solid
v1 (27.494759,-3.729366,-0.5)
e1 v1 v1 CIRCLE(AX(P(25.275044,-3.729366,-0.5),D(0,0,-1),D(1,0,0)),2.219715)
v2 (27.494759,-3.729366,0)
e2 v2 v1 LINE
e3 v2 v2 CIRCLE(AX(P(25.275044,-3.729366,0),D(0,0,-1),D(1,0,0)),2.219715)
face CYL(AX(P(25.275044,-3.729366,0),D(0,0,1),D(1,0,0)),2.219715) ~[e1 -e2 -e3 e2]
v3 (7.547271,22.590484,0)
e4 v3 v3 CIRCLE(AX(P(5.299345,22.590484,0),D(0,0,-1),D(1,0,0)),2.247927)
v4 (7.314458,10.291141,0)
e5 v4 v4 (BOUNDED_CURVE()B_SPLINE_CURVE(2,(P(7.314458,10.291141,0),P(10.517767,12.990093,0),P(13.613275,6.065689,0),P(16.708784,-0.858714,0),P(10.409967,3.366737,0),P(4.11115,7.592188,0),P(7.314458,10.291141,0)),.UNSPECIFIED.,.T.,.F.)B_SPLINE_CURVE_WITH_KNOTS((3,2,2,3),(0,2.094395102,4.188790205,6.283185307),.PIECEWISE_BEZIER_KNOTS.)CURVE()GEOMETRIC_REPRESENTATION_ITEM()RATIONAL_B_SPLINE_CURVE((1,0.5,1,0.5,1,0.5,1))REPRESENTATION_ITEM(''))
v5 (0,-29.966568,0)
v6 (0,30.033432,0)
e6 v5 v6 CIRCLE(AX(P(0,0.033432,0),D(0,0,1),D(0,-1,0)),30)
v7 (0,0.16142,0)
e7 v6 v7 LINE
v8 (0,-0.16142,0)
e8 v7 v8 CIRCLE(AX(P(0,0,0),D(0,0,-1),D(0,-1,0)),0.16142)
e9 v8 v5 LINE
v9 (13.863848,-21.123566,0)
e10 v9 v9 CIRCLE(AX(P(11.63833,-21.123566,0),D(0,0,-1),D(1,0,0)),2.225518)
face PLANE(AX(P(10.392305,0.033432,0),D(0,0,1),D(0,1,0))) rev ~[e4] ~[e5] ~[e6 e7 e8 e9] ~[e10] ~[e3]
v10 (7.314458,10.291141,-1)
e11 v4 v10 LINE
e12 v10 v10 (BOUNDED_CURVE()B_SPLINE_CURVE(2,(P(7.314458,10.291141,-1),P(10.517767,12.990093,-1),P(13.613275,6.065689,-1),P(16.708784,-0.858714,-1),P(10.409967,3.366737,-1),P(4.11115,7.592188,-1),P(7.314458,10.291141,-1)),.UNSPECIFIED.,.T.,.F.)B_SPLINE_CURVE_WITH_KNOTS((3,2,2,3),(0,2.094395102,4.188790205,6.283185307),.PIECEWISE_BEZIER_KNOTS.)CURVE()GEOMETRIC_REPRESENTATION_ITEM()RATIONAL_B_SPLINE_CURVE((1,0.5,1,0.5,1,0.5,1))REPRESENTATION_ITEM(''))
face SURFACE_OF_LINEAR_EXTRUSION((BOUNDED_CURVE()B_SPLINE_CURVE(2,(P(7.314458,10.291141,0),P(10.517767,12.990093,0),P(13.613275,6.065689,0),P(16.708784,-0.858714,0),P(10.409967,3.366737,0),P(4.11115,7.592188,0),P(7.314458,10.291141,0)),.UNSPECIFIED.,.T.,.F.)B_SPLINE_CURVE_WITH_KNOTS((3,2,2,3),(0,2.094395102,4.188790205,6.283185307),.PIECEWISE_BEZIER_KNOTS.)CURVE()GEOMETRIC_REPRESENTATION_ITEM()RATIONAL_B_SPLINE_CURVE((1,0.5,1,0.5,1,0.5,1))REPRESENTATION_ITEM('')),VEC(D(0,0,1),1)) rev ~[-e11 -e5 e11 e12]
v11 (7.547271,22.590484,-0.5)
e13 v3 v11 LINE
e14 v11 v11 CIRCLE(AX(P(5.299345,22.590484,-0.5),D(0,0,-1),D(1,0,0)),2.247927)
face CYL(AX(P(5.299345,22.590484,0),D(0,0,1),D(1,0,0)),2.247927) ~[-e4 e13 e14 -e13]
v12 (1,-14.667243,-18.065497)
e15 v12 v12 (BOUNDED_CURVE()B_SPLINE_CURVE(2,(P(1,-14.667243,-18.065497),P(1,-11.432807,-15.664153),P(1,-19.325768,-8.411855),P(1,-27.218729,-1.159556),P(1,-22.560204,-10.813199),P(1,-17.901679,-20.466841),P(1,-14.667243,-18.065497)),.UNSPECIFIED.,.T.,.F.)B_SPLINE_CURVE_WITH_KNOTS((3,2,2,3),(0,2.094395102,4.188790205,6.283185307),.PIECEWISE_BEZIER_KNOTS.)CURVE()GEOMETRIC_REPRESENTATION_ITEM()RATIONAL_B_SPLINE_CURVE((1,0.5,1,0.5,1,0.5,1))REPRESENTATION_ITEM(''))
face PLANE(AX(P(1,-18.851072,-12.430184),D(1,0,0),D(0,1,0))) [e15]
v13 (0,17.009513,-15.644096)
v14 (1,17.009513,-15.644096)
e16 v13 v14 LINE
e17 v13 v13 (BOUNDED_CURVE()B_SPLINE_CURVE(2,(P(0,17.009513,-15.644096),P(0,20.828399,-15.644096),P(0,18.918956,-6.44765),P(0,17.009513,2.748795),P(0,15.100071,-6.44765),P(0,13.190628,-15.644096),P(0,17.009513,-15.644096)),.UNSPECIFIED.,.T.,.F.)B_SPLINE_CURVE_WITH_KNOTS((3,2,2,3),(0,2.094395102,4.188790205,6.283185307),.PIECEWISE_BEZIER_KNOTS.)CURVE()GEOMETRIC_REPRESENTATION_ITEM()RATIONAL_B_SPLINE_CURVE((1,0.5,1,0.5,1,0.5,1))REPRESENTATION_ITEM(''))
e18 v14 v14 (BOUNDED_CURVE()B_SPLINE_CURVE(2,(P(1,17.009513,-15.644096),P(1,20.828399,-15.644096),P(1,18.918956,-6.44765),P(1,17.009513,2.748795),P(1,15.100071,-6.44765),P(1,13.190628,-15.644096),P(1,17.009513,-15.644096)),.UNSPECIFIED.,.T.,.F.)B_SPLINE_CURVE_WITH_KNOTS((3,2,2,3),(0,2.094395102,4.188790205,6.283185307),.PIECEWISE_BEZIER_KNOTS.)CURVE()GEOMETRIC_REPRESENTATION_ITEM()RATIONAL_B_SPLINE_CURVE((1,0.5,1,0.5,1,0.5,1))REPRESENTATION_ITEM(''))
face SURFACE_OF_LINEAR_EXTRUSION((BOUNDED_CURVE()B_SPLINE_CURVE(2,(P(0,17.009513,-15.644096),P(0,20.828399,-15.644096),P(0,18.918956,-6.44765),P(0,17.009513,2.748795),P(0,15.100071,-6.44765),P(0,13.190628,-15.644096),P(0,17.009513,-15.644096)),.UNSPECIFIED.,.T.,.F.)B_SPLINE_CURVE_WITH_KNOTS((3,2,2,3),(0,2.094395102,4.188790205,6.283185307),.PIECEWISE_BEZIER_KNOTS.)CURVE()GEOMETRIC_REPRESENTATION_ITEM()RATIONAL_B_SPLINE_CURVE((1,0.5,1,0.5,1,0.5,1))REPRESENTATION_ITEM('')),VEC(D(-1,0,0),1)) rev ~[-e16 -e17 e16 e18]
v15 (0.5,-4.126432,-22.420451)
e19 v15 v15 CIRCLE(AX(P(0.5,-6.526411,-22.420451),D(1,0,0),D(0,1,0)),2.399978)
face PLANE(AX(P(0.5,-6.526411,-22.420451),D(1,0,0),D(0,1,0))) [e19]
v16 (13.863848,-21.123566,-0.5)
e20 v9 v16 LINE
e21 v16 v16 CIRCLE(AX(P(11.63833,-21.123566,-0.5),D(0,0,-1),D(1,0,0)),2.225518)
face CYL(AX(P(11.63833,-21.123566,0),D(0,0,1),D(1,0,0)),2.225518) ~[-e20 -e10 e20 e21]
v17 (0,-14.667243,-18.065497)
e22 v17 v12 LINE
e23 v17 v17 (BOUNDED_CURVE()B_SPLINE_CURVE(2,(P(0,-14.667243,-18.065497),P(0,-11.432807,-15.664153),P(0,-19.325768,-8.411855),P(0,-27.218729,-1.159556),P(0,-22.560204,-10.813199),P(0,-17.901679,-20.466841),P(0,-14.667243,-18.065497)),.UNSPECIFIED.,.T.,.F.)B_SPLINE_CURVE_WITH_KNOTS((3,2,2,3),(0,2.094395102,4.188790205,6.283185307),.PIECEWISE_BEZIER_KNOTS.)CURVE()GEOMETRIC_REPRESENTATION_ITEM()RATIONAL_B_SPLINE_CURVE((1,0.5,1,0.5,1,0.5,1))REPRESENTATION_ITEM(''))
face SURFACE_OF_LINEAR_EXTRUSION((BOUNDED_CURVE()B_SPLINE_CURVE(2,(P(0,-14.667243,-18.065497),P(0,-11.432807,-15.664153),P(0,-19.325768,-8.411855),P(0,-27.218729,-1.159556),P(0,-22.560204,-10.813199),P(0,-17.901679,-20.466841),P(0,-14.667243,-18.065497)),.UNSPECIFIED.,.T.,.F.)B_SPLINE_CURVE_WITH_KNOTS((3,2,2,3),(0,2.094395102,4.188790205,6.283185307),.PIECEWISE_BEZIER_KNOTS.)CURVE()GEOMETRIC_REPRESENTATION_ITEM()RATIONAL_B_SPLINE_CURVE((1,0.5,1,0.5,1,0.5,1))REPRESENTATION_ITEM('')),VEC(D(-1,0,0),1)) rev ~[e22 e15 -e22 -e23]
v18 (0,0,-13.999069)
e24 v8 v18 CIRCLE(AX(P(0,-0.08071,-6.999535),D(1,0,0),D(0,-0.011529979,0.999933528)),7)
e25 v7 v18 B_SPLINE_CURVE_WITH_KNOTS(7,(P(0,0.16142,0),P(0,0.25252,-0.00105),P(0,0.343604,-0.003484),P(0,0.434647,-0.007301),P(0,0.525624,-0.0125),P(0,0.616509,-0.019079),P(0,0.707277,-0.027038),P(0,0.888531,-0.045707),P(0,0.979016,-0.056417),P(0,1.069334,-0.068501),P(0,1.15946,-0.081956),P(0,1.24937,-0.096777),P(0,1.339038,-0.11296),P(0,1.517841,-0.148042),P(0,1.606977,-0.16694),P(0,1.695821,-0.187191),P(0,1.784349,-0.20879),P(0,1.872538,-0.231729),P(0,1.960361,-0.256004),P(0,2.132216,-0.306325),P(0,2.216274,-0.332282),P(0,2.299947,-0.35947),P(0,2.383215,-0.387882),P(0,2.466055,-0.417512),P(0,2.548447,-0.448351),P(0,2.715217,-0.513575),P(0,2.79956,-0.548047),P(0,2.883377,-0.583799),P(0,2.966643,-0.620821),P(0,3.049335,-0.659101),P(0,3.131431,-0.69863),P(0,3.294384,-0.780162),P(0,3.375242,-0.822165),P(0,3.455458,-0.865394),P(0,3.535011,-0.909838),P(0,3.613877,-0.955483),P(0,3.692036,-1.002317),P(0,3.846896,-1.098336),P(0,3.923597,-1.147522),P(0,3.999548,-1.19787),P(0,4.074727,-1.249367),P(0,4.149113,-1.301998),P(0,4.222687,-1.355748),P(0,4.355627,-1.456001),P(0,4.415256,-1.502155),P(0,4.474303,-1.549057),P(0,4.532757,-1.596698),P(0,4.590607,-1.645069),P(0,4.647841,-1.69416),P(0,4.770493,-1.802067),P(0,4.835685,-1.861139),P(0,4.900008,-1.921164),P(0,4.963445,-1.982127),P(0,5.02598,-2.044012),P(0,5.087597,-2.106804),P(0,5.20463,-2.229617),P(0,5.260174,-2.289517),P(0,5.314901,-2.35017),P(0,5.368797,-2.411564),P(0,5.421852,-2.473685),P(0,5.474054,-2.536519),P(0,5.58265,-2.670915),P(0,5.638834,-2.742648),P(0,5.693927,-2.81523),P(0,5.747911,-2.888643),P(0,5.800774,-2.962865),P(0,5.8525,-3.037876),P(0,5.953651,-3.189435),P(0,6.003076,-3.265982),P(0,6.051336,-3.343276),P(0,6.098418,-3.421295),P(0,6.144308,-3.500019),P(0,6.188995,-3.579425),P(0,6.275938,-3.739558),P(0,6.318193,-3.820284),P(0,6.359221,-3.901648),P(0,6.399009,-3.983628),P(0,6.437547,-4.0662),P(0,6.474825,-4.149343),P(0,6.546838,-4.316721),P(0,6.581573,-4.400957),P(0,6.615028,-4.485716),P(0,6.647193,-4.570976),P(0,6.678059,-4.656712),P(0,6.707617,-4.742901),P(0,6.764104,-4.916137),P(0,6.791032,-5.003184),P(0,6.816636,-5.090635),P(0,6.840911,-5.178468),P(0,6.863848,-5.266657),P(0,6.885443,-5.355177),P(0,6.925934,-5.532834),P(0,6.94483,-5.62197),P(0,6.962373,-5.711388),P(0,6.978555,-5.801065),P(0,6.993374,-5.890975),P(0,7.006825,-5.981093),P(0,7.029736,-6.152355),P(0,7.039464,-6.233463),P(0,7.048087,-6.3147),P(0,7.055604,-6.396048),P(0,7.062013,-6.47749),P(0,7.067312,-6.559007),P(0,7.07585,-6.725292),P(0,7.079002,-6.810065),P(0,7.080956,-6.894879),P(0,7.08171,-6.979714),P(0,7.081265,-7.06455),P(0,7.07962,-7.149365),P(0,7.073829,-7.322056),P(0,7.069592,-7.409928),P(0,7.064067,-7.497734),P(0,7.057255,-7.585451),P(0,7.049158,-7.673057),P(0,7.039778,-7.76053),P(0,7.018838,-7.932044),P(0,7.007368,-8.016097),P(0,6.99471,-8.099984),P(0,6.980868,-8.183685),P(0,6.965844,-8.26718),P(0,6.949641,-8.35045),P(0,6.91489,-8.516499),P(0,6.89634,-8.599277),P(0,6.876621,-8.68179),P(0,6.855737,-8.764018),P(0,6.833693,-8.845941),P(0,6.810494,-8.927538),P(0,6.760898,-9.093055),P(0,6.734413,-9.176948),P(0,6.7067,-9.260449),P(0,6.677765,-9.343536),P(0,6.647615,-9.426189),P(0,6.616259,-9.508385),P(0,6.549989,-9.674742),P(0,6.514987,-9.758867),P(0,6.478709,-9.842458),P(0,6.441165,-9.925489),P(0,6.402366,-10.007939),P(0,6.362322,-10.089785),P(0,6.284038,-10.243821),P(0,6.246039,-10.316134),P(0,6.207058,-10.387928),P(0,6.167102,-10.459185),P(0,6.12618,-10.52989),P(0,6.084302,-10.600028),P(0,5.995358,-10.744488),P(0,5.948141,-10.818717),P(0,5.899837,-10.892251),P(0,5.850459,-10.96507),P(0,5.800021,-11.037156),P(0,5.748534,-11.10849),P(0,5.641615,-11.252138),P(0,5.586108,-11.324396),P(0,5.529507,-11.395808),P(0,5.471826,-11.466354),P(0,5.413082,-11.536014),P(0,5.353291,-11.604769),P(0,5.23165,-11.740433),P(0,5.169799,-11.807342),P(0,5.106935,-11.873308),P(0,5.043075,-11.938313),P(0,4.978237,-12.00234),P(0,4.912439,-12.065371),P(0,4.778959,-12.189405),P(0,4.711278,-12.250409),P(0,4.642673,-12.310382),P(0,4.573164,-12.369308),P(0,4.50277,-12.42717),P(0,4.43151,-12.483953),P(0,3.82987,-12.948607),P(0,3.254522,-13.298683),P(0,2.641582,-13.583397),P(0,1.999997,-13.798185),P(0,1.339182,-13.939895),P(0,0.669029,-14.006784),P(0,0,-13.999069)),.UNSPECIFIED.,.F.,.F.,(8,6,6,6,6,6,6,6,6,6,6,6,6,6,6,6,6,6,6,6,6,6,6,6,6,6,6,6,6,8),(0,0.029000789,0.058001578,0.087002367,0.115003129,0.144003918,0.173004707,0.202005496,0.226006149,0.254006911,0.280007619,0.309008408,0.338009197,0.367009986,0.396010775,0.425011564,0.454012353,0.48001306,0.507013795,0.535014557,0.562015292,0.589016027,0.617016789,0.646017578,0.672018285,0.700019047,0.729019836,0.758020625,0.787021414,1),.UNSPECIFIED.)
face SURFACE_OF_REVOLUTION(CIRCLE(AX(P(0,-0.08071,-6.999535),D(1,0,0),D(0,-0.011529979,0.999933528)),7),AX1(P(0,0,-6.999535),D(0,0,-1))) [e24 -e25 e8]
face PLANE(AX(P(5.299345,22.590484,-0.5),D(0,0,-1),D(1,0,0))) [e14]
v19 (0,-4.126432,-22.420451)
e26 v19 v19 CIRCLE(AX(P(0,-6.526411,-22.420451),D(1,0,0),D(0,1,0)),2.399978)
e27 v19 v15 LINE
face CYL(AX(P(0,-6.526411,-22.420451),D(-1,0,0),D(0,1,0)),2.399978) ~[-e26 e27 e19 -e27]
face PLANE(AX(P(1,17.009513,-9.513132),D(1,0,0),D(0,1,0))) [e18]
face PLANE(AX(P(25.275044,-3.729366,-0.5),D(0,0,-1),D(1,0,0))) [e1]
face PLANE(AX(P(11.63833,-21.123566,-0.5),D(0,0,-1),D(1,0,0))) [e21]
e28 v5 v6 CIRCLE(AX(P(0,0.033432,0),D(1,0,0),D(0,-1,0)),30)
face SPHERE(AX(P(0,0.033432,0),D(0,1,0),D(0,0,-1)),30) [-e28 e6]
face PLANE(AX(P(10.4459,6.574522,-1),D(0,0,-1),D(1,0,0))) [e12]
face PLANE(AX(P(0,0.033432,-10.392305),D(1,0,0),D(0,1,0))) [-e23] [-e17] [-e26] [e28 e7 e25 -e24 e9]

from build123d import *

# Parameters (mm, degrees)
F1_ANGLE  = 270
F5_DEPTH  = 1
F7_DEPTH  = 1
F8_R      = 2.3999784267
F9_DEPTH  = 0.5
F10_R     = 2.2479266401
F11_DEPTH = 0.5
F12_R     = 2.219715214
F13_DEPTH = 0.5
F14_R     = 2.225517588
F15_DEPTH = 0.5
F21_DEPTH = 1


# Not quite as in the source:
# - the program builds the solid bodies; features that only make, move or delete a surface that nothing else refers to are left out


with BuildPart() as f1:
    # F0 (on Right) → F1 (revolve)
    with BuildSketch(Plane.YZ):
        with BuildLine():
            Line((30.0334315861, 0), (-29.9665684139, 0))
            ThreePointArc((-29.9665684139, 0), (0.0334315861, -30), (30.0334315861, 0))
        make_face()
    revolve(axis=Axis((0, 0.0334315861, 0), (0, 1, 0)), revolution_arc=F1_ANGLE)

    # F2 (on face) → F3 (revolve)
    with BuildSketch(Plane.YZ):
        with BuildLine():
            Line((0, -13.9990693861), (0, 0))
            Line((0, 0), (-0.1614197102, 0))
            ThreePointArc((-0.1614197102, 0), (-7.0802445482, -7.0802445482), (0, -13.9990693861))
        make_face()
        with BuildLine():
            Line((0, -13.9990693861), (0, 0))
            ThreePointArc((0, 0), (-7.0807098551, -6.9995346931), (0, -13.9990693861))
        make_face()
    revolve(axis=Axis((0, 0, -6.9995346931), (0, 0, -1)))

    # F4 (on Right) → F5 (join)
    with BuildSketch(Plane.YZ):
        with BuildLine():
            add(Edge.make_bspline(
                [(17.0095134526, -15.6440958381), (20.8283990638, -15.6440958381), (18.9189562582, -6.4476504922), (17.0095134526, 2.7487948537), (15.1000706471, -6.4476504922), (13.1906278415, -15.6440958381), (17.0095134526, -15.6440958381)],
                knots=[0, 0, 0, 2.0943951024, 2.0943951024, 4.1887902048, 4.1887902048, 6.2831853072, 6.2831853072, 6.2831853072], degree=2, weights=[1, 0.5, 1, 0.5, 1, 0.5, 1]))
        make_face()
    extrude(amount=F5_DEPTH)

    # F6 (on Right) → F7 (join)
    with BuildSketch(Plane.YZ):
        with BuildLine():
            add(Edge.make_bspline(
                [(-14.6672427654, -18.0654972792), (-11.4328069704, -15.6641534543), (-19.325768114, -8.4118548322), (-27.2187292576, -1.15955621), (-22.560203909, -10.8131986571), (-17.9016785604, -20.4668411041), (-14.6672427654, -18.0654972792)],
                knots=[0, 0, 0, 2.0943951024, 2.0943951024, 4.1887902048, 4.1887902048, 6.2831853072, 6.2831853072, 6.2831853072], degree=2, weights=[1, 0.5, 1, 0.5, 1, 0.5, 1]))
        make_face()
    extrude(amount=F7_DEPTH)

    # F8 (on face) → F9 (join)
    with BuildSketch(Plane.YZ):
        with Locations((-6.5264105797, -22.420451045)):
            Circle(F8_R)
    extrude(amount=F9_DEPTH)

    # F10 (on face) → F11 (join)
    with BuildSketch(Plane(origin=(0, 0, 0), x_dir=(1, 0, 0), z_dir=(0, 0, -1))):
        with Locations((5.2993446589, -22.5904844701)):
            Circle(F10_R)
    extrude(amount=F11_DEPTH)

    # F12 (on face) → F13 (join)
    with BuildSketch(Plane(origin=(0, 0, 0), x_dir=(1, 0, 0), z_dir=(0, 0, -1))):
        with Locations((25.2750441432, 3.729365766)):
            Circle(F12_R)
    extrude(amount=F13_DEPTH)

    # F14 (on face) → F15 (join)
    with BuildSketch(Plane(origin=(0, 0, 0), x_dir=(1, 0, 0), z_dir=(0, 0, -1))):
        with Locations((11.6383302957, 21.1235657334)):
            Circle(F14_R)
    extrude(amount=F15_DEPTH)

    # F20 (on face) → F21 (join)
    with BuildSketch(Plane(origin=(0, 0, 0), x_dir=(1, 0, 0), z_dir=(0, 0, -1))):
        with BuildLine():
            add(Edge.make_bspline(
                [(7.3144584894, -10.2911405265), (10.5177671604, -12.9900925853), (13.6132754829, -6.0656891234), (16.7087838054, 0.8587143384), (10.4099668119, -3.3667370647), (4.1111498184, -7.5921884678), (7.3144584894, -10.2911405265)],
                knots=[0, 0, 0, 2.0943951024, 2.0943951024, 4.1887902048, 4.1887902048, 6.2831853072, 6.2831853072, 6.2831853072], degree=2, weights=[1, 0.5, 1, 0.5, 1, 0.5, 1]))
        make_face()
    extrude(amount=F21_DEPTH)


solid = f1.part
